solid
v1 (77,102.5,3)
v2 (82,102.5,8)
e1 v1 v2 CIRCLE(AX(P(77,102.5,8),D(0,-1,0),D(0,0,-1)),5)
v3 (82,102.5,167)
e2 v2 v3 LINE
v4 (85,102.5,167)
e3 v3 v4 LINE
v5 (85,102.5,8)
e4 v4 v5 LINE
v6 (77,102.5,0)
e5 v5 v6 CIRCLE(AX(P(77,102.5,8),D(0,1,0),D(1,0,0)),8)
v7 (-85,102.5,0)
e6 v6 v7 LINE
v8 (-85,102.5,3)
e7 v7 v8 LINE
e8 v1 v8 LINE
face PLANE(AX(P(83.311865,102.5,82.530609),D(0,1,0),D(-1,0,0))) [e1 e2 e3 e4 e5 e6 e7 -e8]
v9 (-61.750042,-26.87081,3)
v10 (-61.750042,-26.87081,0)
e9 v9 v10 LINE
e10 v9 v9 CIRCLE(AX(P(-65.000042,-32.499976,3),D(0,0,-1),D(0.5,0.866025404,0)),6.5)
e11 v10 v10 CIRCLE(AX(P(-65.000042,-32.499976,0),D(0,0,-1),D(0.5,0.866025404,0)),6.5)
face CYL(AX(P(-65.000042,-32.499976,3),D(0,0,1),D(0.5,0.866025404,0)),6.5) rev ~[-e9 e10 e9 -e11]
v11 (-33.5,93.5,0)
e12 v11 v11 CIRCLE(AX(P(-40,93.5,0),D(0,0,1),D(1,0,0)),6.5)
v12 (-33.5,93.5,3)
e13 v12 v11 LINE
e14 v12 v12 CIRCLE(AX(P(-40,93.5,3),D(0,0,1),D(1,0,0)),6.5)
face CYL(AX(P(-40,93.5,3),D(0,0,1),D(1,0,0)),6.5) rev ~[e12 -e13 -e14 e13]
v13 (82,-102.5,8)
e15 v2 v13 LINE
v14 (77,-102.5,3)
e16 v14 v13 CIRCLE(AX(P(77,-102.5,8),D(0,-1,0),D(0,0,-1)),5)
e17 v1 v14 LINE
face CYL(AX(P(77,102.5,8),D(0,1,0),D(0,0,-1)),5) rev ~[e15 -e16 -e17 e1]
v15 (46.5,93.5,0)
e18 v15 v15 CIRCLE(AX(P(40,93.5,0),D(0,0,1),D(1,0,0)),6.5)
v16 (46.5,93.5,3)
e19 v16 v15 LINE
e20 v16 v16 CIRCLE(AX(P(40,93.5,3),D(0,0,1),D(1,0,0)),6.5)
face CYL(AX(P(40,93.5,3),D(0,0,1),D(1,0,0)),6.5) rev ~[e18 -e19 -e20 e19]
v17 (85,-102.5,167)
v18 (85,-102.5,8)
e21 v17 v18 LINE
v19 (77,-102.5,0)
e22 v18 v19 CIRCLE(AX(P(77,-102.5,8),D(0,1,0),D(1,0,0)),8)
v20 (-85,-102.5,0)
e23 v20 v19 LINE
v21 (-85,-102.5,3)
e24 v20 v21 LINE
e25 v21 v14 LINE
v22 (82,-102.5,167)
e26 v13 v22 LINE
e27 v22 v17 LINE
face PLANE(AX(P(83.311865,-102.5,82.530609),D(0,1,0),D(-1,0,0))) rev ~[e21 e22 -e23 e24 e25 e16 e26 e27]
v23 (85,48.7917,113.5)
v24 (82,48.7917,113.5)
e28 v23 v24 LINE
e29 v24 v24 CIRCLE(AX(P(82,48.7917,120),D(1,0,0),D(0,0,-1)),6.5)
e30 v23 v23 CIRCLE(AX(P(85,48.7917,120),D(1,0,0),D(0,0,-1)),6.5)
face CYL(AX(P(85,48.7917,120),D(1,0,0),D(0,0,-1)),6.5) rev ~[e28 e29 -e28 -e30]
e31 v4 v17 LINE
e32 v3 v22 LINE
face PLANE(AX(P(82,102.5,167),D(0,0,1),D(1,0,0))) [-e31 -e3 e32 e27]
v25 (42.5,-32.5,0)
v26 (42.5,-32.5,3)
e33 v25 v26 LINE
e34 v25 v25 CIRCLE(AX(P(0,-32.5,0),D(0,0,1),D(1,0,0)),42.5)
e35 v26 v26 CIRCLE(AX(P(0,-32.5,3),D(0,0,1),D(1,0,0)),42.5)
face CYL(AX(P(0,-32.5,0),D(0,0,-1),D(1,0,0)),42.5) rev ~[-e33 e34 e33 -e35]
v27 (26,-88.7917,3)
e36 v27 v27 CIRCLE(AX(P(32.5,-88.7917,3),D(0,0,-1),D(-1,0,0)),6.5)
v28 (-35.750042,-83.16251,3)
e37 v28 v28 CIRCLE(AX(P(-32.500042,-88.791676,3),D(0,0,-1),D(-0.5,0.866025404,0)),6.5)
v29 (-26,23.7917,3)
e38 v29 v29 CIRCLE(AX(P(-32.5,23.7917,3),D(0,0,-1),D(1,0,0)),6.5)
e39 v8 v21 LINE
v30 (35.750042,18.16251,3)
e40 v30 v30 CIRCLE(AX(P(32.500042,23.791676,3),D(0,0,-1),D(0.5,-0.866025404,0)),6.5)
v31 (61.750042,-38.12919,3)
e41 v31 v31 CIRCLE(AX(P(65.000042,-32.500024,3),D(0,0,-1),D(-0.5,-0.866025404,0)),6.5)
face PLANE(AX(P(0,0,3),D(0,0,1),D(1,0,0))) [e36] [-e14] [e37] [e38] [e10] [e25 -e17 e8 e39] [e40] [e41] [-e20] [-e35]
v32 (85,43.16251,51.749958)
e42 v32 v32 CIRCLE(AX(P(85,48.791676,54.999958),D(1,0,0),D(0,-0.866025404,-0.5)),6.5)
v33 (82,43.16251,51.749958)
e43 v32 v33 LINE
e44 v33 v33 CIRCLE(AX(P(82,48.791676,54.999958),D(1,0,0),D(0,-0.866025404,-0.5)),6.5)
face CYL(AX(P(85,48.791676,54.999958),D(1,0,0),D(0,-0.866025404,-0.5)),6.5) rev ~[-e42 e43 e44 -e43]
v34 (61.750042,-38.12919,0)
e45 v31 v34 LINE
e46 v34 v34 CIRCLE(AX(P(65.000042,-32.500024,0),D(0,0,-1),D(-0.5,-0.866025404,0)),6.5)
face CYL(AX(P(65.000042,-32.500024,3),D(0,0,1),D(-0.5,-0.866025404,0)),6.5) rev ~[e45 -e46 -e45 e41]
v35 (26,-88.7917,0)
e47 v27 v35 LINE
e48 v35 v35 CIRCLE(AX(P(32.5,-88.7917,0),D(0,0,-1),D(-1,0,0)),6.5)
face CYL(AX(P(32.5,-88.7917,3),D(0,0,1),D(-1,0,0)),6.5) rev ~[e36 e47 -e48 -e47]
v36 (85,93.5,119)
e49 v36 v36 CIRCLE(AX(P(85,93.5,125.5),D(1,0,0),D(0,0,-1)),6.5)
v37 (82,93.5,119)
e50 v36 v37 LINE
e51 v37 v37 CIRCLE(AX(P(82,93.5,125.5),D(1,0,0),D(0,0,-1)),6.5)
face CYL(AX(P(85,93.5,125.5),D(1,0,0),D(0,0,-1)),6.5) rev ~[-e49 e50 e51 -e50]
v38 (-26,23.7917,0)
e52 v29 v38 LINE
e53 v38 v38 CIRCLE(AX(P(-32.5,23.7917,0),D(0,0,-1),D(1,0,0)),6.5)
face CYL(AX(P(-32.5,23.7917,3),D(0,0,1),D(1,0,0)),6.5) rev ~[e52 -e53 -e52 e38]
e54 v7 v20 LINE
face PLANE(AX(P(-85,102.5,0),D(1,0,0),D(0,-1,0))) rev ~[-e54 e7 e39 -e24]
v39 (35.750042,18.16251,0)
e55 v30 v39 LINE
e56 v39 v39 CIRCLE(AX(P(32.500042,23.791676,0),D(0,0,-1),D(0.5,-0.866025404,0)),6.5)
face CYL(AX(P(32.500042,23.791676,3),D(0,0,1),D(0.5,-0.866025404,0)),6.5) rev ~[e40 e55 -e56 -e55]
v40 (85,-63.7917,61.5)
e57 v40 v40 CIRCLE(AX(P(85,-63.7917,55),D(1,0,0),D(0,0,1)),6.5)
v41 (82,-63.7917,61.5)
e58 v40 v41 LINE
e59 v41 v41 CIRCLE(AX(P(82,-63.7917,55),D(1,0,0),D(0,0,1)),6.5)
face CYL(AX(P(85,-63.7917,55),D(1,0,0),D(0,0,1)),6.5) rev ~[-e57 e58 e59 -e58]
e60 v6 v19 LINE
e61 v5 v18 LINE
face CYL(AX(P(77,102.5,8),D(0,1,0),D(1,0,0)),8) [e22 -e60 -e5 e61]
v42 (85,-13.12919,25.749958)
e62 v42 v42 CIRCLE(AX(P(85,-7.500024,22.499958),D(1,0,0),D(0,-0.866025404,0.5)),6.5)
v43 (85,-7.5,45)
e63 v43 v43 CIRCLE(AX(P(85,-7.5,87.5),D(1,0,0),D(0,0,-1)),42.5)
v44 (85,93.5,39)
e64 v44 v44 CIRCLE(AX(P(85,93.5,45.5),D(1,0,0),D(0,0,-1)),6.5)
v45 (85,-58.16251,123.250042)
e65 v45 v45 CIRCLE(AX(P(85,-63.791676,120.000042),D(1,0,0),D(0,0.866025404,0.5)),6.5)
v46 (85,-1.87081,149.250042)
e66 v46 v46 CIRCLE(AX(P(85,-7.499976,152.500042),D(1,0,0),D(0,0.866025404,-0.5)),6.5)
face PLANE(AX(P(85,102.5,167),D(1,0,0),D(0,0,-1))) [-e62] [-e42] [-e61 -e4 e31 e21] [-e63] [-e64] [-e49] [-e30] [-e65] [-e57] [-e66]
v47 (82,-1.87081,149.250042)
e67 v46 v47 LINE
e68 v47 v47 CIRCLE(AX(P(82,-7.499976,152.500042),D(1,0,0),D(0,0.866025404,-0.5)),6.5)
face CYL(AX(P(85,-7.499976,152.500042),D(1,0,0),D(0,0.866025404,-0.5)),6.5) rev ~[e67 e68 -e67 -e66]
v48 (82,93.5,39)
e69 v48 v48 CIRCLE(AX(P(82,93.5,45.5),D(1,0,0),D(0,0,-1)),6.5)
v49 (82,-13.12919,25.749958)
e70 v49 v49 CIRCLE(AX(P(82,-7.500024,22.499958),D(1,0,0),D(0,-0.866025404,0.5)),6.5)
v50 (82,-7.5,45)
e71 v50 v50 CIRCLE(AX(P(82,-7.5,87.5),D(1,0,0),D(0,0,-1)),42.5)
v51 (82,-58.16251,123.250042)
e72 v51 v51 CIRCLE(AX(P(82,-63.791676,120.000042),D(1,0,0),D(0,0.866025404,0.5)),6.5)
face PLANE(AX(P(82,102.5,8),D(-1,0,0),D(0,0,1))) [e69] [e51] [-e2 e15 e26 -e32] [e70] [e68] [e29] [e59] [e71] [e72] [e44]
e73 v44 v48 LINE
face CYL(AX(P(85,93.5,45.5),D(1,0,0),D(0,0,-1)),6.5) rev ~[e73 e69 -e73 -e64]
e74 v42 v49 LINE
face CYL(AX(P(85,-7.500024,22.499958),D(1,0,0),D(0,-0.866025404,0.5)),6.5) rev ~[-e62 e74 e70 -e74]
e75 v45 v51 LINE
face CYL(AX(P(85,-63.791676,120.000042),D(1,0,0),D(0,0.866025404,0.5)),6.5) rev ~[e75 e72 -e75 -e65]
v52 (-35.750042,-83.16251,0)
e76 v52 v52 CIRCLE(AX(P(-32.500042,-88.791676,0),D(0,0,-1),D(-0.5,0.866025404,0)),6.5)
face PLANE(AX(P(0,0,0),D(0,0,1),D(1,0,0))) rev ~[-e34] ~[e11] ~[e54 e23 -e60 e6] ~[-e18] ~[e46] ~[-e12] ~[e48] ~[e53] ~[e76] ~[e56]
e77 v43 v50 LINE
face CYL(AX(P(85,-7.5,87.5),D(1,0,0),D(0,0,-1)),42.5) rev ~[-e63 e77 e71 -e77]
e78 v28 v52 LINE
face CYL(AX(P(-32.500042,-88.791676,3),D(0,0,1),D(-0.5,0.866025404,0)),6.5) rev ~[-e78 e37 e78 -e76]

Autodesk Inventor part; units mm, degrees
ref_plane "YZ Plane" through (0, 0, 0) normal (1, 0, 0) x (0, 1, 0)
ref_plane "XZ Plane" through (0, 0, 0) normal (0, 1, 0) x (-1, 0, 0)
ref_plane "XY Plane" through (0, 0, 0) normal (0, 0, 1) x (1, 0, 0)
sketch "Sketch1" plane through (0, 0, 0) normal (0, 0, 1) x (1, 0, 0)
  line L0 (-85, -102.5) -> (85, -102.5)
  line L1 (85, -102.5) -> (85, 102.5)
  line L2 (85, 102.5) -> (-85, 102.5)
  line L3 (-85, 102.5) -> (-85, -102.5)
  line L4 (-85, -102.5) -> (85, 102.5) construction
  line L5 (85, -102.5) -> (-85, 102.5) construction
  circle A0 centre (0, -32.5) radius 42.5
  point P0 (0, 0)
  point P1 (0, -102.5)
  dimension "d0" = 170
  dimension "d1" = 205
  dimension "d22" = 85
  dimension "d61" = 70
extrude "Plate1" add sketch "Sketch1" along normal blind 3
sketch "Sketch5" plane through (82, 102.5, 0) normal (1, 0, 0) x (0, 1, 0)
  line L0 (-205, 0) -> (0, 0)
  line L1 (0, 0) -> (0, 167)
  line L2 (0, 167) -> (-205, 167)
  line L3 (-205, 167) -> (-205, 0)
edge flange "Flange2" height 167 angle 90 thickness 3 bend radius 5 thickness toward (1, 0, 0) relief round relief width 3 relief depth 1.5 edges at (85, 0, 3) wall of the first edge with corners at (82, -102.5, 0) (82, 102.5, 0) (82, 102.5, 167) (82, -102.5, 167)
bend "Bend2"
corner "Corner2"
sketch "Sketch6" plane through (85, -102.5, 167) normal (1, 0, 0) x (0, 0, -1)
  line L0 (159, 0) -> (159, 205) projected
  line L1 (0, 205) -> (159, 205) projected
  line L2 (0, 0) -> (0, 205) projected
  line L3 (159, 0) -> (0, 0) projected
  circle A0 centre (79.5, 95) radius 42.5
  point P0 (167, 102.5)
  point P1 (79.5, 205)
  dimension "d33" = 85
  dimension "d60" = 95
extrude "Cut1" cut sketch "Sketch6" against normal blind 3 contours A0
sketch "Sketch7" plane through (85, -102.5, 167) normal (1, 0, 0) x (0, 0, -1)
  circle A0 centre (47, 151.2917) radius 6.5
  circle A1 centre (79.5, 95) radius 42.5 projected
  circle A2 centre (79.5, 95) radius 65 construction
  line L0 (79.5, 95) -> (79.5, 137.5)
  line L1 (79.5, 95) -> (47, 151.2917)
  point P0 (167, 102.5)
  dimension "d37" = 130
  dimension "d36" = 13
  dimension "d81" = 30
extrude "Cut2" cut sketch "Sketch7" against normal blind 3 contours A0
pattern_circular "Circular Pattern1" count 6 over 360 about axis through (85, -7.5, 87.5) along (-1, 0, 0) of "Cut2"
sketch "Sketch8" plane through (0, 0, 3) normal (0, 0, 1) x (1, 0, 0)
  circle A0 centre (-32.5, 23.7917) radius 6.5
  circle A1 centre (0, -32.5) radius 65 construction
  circle A2 centre (0, -32.5) radius 42.5 projected
  line L0 (0, 10) -> (0, -32.5)
  line L1 (0, -32.5) -> (-32.5, 23.7917)
  dimension "d44" = 130
  dimension "d43" = 13
  dimension "d82" = 30
extrude "Cut3" cut sketch "Sketch8" against normal blind 3 contours A0
pattern_circular "Circular Pattern2" count 6 over 360 about axis through (0, -32.5, 0) along (0, 0, 1) of "Cut3"
sketch "Sketch10" plane through (85, -102.5, 167) normal (1, 0, 0) x (0, 0, -1)
  circle A0 centre (41.5, 196) radius 6.5
  circle A1 centre (121.5, 196) radius 6.5
  line L0 (159, 205) -> (0, 205) projected
  line L1 (81.5, 200.962) -> (81.5, 182.1235)
  point P0 (167, 102.5)
  dimension "d62" = 13
  dimension "d63" = 9
  dimension "d64" = 80
  dimension "d72" = 81.5
extrude "Cut4" cut sketch "Sketch10" against normal blind 3
sketch "Sketch11" plane through (0, 0, 3) normal (0, 0, 1) x (1, 0, 0)
  circle A0 centre (-40, 93.5) radius 6.5
  circle A1 centre (40, 93.5) radius 6.5
  line L0 (0, 102.5) -> (0, 73.9677)
  line L1 (-85, 102.5) -> (77, 102.5) projected
  point P0 (0, 0)
  dimension "d67" = 13
  dimension "d68" = 80
  dimension "d69" = 9
extrude "Cut5" cut sketch "Sketch11" against normal blind 3
equation "\"d33\" = d22"
equation "\"d34\" = Thickness"
equation "\"d38\" = Thickness"
equation "\"d45\" = Thickness"
equation "\"d65\" = Thickness"
equation "\"d70\" = Thickness"
equation "\"d2\" = Thickness"
equation "\"d23\" = BendReliefWidth"
equation "\"d24\" = BendReliefDepth"
equation "\"d25\" = MinimumRemnant"
equation "\"d26\" = TransitionRadius"
equation "\"d29\" = BendRadius"
equation "\"d30\" = CornerReliefSize"
equation "\"d31\" = GapSize"
equation "\"d32\" = JacobiRadiusSize"
equation "\"BendReliefWidth\" = Thickness"
equation "\"BendReliefDepth\" = 0.5 * Thickness"
equation "\"CornerReliefSize\" = 4 * Thickness"
equation "\"MinimumRemnant\" = 2 * Thickness"
equation "\"TransitionRadius\" = BendRadius"
equation "\"JacobiRadiusSize\" = BendRadius"
equation "\"GapSize\" = Thickness"
equation "\"Thickness\" = 3"
equation "\"BendRadius\" = 5"
properties part number "drain wall with flange" material "Stainless Steel"
